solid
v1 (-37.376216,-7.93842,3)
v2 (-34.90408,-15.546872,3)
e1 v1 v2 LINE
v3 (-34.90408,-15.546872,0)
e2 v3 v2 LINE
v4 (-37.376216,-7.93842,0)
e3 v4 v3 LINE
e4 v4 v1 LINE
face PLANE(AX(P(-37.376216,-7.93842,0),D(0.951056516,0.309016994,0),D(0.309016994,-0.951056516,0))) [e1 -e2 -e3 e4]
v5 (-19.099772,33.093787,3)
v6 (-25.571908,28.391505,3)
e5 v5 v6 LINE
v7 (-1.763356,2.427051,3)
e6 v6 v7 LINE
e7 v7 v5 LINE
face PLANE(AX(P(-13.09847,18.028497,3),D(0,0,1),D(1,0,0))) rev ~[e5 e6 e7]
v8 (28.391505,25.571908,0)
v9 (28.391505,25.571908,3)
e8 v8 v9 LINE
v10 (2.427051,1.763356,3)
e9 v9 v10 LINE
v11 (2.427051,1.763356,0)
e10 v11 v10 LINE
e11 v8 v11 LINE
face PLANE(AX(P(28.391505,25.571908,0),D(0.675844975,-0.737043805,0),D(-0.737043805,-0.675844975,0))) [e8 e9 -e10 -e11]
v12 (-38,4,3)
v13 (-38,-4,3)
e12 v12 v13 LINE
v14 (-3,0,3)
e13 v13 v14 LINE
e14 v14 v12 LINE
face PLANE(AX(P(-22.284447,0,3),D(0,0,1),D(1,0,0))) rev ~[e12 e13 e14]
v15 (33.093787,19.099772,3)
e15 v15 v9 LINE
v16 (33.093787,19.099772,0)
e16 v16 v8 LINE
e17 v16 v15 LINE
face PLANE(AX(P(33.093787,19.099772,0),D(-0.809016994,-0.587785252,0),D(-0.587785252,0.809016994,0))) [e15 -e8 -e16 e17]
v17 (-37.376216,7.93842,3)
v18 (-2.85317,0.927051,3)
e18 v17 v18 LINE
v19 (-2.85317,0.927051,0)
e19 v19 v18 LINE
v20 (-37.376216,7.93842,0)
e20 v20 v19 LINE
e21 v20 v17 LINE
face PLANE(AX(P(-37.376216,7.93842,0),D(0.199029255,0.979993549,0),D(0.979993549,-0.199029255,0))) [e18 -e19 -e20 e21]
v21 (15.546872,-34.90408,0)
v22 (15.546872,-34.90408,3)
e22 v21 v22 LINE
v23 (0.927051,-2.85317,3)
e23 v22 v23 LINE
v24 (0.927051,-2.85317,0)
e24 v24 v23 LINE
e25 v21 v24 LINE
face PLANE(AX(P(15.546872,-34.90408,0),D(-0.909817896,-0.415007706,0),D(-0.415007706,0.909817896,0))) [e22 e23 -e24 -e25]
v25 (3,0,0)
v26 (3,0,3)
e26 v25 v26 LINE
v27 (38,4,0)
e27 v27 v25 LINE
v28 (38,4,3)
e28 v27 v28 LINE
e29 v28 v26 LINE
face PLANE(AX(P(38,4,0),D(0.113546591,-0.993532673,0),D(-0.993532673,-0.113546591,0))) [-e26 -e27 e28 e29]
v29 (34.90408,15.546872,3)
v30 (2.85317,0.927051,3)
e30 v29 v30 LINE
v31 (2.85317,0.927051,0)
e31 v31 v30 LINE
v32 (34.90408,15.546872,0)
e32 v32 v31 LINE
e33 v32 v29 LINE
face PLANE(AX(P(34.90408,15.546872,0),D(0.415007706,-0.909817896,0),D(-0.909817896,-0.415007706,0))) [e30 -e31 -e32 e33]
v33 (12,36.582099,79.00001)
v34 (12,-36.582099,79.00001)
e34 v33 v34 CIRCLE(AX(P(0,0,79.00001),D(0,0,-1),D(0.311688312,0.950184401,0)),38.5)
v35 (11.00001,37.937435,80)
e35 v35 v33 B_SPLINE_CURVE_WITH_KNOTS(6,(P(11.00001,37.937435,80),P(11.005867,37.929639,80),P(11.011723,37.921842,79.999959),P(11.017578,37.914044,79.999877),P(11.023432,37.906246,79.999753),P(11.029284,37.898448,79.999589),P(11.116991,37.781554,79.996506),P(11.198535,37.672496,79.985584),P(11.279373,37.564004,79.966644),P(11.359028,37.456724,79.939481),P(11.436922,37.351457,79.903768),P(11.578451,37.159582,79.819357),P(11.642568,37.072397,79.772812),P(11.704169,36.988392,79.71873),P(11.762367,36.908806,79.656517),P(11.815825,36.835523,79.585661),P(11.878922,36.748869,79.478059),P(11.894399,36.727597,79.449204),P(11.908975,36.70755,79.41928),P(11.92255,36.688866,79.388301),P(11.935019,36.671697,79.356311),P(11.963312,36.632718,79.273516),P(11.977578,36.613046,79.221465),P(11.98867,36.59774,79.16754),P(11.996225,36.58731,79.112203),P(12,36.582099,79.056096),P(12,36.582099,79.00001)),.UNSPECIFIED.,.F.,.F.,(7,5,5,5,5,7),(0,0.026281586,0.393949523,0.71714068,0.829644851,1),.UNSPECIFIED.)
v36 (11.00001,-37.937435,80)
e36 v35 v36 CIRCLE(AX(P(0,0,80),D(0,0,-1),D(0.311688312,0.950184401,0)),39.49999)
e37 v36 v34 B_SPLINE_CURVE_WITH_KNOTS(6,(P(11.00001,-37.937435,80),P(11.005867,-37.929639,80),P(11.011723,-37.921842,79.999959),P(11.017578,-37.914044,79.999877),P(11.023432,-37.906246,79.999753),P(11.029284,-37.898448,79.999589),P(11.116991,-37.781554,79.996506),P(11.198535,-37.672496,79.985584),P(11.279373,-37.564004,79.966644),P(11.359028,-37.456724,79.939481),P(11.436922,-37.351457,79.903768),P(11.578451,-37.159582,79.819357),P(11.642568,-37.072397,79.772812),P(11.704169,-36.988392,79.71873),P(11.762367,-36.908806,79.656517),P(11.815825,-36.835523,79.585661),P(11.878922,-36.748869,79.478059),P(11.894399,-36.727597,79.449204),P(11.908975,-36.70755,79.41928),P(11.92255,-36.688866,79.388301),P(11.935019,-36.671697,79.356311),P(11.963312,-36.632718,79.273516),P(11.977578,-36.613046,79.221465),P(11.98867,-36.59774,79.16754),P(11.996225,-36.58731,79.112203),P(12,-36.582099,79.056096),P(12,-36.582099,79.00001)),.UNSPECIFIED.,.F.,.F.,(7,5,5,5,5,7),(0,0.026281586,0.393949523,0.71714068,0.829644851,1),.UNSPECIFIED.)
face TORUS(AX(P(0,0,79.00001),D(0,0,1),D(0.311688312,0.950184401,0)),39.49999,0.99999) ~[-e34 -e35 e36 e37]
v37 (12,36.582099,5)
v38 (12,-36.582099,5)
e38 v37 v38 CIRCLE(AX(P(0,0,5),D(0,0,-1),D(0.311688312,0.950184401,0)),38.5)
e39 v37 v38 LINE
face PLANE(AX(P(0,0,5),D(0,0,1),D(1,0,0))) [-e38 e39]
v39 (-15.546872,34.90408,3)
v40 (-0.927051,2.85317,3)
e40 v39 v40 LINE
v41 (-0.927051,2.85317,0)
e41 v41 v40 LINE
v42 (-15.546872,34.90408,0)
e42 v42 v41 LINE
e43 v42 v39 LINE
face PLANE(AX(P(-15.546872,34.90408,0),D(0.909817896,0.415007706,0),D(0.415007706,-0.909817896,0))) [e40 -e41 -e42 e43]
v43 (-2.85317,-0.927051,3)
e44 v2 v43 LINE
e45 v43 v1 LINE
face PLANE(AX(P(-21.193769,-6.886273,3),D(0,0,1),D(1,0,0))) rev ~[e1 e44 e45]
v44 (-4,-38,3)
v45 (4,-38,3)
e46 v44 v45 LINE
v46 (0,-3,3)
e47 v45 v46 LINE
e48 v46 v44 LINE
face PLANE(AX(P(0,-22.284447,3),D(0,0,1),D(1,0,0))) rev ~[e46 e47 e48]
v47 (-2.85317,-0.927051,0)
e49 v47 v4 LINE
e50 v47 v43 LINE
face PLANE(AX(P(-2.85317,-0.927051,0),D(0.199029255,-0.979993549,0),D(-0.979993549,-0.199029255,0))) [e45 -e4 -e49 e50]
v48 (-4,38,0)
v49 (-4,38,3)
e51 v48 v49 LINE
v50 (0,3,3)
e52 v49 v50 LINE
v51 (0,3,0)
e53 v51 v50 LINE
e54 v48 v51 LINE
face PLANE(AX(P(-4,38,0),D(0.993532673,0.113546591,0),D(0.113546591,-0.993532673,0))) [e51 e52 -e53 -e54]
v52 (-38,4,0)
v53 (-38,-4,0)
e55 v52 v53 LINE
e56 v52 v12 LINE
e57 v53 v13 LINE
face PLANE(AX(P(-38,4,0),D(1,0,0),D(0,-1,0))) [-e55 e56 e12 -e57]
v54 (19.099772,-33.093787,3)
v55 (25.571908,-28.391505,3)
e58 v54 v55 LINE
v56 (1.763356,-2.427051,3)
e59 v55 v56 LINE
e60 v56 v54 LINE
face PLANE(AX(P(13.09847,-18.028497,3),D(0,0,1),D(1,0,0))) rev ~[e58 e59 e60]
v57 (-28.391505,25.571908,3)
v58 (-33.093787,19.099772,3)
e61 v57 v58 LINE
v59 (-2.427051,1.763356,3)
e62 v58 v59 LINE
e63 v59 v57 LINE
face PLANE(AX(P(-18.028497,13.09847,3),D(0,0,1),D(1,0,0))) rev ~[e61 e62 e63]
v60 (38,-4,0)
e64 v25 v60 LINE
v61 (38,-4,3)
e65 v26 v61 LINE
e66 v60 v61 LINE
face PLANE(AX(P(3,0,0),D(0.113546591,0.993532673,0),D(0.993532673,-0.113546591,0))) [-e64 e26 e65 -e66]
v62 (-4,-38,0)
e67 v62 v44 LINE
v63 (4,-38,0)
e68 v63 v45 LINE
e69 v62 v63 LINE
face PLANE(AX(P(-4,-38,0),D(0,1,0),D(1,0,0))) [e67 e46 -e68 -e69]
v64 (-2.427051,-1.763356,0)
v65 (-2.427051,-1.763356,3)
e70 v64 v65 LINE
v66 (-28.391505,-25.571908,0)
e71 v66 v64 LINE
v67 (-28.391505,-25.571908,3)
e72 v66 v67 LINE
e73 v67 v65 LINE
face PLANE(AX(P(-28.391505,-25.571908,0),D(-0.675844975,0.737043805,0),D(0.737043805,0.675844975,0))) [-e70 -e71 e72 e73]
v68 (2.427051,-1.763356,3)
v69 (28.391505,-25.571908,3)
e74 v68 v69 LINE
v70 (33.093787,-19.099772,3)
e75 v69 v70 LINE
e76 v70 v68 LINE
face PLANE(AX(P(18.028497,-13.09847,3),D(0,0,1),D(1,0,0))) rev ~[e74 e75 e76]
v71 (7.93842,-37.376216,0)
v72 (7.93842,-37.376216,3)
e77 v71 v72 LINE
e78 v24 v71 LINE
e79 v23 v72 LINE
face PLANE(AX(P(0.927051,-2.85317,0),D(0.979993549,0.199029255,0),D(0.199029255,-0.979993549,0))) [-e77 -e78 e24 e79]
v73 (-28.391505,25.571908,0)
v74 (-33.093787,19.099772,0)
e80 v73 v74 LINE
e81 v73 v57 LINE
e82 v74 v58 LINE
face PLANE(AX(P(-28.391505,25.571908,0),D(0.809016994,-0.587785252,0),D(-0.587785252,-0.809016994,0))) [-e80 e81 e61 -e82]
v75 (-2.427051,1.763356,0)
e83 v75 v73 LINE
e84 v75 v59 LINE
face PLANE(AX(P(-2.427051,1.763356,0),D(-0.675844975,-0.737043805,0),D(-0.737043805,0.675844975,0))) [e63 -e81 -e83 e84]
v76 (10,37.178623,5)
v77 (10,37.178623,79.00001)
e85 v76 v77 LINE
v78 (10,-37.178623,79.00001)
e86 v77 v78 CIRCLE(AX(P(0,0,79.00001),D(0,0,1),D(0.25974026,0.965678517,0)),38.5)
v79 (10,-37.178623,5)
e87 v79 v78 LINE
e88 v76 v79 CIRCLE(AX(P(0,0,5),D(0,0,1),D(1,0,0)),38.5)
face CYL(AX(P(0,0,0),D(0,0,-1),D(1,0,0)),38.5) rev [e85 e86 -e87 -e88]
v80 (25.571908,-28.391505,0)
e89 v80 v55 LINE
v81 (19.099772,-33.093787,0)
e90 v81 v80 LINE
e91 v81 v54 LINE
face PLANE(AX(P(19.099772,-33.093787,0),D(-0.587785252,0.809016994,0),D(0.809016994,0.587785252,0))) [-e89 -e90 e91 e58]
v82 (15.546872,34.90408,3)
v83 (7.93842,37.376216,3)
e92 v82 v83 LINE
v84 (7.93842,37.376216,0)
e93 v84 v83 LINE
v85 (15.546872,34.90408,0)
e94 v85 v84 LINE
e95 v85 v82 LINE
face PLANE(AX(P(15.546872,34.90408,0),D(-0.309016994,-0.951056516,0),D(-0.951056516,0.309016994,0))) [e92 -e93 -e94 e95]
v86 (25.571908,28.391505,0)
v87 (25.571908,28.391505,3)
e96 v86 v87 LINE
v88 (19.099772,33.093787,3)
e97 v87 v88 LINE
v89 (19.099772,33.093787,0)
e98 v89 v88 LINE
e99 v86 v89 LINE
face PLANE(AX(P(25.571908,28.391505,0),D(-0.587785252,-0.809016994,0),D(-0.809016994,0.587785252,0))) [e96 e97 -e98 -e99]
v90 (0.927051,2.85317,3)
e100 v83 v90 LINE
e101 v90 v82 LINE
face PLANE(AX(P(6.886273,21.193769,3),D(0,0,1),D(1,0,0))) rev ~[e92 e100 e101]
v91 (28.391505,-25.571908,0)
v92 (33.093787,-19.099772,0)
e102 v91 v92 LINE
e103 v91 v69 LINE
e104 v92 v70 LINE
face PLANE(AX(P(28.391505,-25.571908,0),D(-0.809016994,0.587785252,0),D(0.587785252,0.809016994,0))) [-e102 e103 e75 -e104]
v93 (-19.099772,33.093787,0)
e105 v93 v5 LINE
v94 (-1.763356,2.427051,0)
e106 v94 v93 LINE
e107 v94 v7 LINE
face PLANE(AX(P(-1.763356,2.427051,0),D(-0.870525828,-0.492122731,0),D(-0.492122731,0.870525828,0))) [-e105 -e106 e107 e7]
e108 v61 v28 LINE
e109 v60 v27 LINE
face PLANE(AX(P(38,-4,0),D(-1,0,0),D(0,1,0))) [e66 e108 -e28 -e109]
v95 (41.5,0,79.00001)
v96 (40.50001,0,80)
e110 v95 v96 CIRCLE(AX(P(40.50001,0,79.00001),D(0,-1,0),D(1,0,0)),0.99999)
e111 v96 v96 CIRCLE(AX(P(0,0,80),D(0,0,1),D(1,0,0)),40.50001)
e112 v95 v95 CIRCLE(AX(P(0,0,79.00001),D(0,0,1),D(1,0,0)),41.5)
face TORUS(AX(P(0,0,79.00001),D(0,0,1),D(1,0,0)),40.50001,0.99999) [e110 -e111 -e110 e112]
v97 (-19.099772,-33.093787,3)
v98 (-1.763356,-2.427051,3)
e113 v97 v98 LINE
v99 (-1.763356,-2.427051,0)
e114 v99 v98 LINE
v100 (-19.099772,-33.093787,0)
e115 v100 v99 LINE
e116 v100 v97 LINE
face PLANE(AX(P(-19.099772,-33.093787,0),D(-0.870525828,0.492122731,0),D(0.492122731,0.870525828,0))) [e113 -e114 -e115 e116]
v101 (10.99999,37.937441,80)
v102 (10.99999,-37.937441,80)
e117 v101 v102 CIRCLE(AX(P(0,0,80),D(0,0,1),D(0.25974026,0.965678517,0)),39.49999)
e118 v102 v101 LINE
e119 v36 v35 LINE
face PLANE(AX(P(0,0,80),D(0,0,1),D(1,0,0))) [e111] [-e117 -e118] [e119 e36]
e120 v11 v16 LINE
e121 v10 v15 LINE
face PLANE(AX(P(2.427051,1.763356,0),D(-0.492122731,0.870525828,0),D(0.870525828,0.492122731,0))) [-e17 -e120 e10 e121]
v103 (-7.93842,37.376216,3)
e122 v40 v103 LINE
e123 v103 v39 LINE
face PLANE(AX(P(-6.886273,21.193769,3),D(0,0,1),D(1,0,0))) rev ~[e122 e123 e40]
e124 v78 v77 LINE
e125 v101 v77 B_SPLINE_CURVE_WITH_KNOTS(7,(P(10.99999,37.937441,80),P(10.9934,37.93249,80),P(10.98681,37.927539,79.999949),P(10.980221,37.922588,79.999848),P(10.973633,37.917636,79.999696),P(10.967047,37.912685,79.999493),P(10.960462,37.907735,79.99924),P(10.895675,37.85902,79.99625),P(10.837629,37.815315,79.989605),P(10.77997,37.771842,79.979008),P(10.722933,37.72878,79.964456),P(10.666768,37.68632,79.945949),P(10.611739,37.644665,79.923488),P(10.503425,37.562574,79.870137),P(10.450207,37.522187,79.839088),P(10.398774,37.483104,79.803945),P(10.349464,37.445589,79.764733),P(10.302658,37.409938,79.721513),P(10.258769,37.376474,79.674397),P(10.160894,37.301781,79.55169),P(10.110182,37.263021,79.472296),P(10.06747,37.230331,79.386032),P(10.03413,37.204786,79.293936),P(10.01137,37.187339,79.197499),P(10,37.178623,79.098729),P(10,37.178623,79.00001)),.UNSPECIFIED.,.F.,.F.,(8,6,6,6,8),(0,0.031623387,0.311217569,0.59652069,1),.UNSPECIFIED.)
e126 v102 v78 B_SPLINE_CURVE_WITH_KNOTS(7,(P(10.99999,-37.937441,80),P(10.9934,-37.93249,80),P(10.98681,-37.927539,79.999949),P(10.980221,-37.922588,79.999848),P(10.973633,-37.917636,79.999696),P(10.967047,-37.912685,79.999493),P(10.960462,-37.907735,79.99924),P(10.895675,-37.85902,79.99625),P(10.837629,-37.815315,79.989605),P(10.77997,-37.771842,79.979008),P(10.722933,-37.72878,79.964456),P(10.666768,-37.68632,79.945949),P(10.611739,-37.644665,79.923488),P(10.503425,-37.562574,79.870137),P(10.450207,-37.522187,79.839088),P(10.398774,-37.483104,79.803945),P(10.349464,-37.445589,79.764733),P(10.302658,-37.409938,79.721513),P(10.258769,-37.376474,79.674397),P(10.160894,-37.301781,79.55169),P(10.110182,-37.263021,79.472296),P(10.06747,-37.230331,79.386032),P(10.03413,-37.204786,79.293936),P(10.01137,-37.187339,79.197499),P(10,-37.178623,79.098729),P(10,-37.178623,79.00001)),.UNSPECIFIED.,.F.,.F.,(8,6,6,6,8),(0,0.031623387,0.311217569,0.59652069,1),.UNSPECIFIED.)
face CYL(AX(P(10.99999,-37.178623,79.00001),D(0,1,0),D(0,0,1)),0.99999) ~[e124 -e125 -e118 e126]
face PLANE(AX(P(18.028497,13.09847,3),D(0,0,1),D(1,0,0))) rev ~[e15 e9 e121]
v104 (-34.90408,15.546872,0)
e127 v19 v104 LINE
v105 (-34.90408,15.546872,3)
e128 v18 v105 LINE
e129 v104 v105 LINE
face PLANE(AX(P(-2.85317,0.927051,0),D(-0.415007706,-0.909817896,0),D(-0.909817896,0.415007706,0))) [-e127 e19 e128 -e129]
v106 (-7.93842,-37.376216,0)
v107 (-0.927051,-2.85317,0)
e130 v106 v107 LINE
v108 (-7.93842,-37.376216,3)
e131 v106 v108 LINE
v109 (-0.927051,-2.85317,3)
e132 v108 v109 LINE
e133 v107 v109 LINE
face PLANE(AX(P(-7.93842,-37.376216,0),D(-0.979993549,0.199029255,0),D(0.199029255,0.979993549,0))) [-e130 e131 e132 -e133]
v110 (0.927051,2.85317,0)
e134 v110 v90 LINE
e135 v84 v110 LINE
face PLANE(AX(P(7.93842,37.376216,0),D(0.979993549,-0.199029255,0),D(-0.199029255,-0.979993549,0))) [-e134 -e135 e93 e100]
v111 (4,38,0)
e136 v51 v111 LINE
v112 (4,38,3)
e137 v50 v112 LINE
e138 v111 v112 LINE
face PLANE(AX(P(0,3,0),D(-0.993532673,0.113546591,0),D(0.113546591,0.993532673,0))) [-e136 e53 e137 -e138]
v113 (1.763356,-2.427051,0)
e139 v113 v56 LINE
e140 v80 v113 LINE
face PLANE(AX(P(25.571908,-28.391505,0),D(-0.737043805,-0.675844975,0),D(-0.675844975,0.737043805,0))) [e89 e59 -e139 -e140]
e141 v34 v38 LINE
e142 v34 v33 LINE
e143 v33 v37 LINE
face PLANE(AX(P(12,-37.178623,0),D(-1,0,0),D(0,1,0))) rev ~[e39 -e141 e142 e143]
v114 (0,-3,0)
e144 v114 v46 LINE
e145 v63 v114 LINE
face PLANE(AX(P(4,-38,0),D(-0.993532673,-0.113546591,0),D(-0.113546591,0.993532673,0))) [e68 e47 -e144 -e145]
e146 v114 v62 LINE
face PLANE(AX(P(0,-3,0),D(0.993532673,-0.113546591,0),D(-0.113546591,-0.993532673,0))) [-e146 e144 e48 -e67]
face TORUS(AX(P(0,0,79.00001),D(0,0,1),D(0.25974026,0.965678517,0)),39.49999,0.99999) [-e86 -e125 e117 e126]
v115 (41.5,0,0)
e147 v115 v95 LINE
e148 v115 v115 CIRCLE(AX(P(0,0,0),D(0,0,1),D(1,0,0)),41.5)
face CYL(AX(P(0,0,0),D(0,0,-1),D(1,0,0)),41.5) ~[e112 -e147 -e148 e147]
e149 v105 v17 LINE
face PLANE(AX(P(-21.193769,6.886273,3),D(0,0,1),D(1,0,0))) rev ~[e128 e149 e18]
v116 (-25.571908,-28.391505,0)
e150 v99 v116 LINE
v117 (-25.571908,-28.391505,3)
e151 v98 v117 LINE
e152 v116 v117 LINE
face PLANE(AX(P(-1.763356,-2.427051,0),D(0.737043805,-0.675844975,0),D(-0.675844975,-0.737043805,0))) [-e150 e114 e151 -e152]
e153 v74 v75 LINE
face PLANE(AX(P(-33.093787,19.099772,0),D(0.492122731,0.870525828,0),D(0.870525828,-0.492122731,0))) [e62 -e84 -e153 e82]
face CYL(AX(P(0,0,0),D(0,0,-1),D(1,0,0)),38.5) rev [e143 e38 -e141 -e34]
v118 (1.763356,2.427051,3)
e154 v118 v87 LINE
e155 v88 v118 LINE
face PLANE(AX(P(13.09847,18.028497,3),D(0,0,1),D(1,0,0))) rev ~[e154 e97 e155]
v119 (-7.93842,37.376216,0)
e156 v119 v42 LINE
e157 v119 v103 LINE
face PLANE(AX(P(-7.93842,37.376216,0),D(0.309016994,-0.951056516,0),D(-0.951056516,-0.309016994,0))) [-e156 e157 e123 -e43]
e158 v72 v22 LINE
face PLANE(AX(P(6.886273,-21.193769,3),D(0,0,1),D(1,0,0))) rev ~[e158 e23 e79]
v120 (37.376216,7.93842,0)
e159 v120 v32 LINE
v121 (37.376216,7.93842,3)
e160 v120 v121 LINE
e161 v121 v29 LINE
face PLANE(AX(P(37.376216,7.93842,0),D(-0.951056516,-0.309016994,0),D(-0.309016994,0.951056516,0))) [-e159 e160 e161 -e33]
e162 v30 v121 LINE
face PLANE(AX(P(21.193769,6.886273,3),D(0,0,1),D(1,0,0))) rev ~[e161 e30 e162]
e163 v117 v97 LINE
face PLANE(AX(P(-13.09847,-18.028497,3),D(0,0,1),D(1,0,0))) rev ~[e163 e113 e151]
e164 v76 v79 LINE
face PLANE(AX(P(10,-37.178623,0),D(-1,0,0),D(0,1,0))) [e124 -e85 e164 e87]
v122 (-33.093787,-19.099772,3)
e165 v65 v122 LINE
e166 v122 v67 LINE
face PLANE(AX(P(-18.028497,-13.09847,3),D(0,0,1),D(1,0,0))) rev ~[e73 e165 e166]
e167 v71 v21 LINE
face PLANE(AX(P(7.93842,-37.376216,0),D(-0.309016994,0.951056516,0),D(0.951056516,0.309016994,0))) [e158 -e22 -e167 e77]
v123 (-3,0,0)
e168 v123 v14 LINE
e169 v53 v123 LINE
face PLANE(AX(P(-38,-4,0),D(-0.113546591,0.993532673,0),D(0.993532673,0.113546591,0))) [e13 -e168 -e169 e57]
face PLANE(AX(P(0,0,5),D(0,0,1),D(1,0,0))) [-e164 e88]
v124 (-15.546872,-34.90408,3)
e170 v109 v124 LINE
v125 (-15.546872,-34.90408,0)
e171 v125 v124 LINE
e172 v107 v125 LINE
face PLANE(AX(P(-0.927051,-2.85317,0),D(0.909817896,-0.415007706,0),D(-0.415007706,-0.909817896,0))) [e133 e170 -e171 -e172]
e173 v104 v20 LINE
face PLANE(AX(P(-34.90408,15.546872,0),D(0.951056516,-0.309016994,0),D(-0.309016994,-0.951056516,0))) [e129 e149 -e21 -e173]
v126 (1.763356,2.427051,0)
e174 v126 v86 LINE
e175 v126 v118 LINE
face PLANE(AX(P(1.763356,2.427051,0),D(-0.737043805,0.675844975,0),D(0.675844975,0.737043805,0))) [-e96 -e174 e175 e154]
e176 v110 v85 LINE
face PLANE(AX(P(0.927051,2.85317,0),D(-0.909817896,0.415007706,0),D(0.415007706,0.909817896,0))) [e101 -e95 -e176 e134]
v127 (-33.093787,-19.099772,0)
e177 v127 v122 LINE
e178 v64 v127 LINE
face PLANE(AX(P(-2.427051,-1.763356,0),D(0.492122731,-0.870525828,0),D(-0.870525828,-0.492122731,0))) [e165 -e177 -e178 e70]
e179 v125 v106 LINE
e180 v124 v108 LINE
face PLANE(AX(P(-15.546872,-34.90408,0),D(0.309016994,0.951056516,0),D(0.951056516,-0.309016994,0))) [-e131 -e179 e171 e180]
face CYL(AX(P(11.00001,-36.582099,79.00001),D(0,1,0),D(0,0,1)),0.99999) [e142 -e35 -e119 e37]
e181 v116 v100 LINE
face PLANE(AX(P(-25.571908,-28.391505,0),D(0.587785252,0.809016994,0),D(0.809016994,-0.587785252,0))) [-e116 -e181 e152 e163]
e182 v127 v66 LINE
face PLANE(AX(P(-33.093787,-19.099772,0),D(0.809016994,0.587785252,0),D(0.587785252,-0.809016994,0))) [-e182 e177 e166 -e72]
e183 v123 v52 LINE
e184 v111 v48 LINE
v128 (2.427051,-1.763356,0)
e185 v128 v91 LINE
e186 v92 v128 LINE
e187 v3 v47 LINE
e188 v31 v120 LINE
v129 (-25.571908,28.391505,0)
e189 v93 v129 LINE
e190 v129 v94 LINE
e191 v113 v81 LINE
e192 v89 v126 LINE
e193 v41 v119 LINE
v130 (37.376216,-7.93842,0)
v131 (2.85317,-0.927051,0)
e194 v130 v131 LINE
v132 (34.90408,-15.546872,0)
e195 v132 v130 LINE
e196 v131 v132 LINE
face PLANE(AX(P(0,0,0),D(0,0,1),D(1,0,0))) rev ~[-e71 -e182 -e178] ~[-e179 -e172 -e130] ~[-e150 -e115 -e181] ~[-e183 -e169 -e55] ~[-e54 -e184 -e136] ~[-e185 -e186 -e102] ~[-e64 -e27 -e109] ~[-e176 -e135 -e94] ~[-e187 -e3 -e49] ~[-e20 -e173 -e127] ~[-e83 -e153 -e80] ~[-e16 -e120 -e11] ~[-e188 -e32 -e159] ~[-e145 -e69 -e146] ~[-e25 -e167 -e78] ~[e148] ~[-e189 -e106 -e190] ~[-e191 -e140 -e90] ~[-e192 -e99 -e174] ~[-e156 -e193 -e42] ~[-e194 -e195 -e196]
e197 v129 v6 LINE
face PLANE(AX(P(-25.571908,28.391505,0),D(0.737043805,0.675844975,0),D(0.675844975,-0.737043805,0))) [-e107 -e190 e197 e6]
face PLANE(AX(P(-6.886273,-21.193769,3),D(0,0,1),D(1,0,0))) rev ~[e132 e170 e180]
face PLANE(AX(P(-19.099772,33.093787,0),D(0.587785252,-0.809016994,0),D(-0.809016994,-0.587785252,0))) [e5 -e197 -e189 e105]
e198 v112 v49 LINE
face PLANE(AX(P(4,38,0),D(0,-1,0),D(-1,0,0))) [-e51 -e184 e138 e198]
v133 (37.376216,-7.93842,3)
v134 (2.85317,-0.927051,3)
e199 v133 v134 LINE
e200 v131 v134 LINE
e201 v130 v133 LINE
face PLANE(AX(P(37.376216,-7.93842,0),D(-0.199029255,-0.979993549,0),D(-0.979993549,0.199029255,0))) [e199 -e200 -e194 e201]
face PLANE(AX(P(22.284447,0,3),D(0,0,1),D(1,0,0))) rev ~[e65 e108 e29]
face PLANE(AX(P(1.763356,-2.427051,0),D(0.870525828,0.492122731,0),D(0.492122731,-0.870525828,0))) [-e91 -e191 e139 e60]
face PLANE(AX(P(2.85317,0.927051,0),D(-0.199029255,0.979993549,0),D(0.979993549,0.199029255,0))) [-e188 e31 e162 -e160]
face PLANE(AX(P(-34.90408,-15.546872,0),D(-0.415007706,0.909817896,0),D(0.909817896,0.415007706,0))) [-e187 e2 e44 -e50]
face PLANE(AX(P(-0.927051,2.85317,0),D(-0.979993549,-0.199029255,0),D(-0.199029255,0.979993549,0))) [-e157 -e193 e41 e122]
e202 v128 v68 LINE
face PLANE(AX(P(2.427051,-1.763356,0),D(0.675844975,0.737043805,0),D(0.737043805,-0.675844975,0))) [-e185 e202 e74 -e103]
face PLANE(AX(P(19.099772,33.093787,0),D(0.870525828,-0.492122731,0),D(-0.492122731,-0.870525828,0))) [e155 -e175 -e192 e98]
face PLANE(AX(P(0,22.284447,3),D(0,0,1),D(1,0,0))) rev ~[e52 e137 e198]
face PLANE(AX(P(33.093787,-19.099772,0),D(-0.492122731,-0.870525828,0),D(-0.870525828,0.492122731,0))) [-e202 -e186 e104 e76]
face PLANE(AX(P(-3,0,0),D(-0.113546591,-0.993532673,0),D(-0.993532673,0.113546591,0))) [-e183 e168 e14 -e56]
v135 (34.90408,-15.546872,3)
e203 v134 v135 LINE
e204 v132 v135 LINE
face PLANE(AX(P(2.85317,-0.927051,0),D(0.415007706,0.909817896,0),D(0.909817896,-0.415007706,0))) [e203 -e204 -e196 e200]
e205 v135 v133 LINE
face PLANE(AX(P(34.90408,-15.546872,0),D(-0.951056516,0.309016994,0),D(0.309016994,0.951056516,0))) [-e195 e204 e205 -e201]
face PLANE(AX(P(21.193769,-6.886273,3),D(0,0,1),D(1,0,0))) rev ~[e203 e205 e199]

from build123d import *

# Parameters (mm, degrees)
F0_R     = 38.5
F2_DEPTH = 5
F0_R_2   = 41.5
F1_W     = 2
F1_H     = 74.3572457801
F3_DEPTH = 80
F5_DEPTH = 3
F6_R     = 0.99999


# Not quite as in the source:
# - a fillet or chamfer is up to 0.001 mm smaller than in the source, because OpenCascade refuses the exact size


with BuildPart() as f2:
    # F0 (on Top) → F2 (new body)
    with BuildSketch(Plane.XY):
        Circle(F0_R)
    extrude(amount=F2_DEPTH)

    # F0 (on Top) + F1 (on Top) → F3 (join)
    with BuildSketch(Plane.XY):
        Circle(F0_R_2)
        Circle(F0_R, mode=Mode.SUBTRACT)
    with BuildSketch(Plane.XY):
        with Locations((11, 0)):
            Rectangle(F1_W, F1_H)
    extrude(amount=F3_DEPTH)

    # F4 (on Top) → F5 (cut)
    with BuildSketch(Plane.XY):
        Polygon((0, -3), (-4, -38), (4, -38), align=None)
        Polygon((15.5468718514, -34.9040796417), (0.9270509831, -2.8531695489), (7.9384197211, -37.3762155967), align=None)
        Polygon((25.5719075646, -28.3915047771), (1.7633557569, -2.4270509831), (19.0997716096, -33.0937867954), align=None)
        Polygon((33.0937867954, -19.0997716096), (2.4270509831, -1.7633557569), (28.3915047771, -25.5719075646), align=None)
        Polygon((37.3762155967, -7.9384197211), (2.8531695489, -0.9270509831), (34.9040796417, -15.5468718514), align=None)
        Polygon((38, 4), (3, 0), (38, -4), align=None)
        Polygon((34.9040796417, 15.5468718514), (2.8531695489, 0.9270509831), (37.3762155967, 7.9384197211), align=None)
        Polygon((28.3915047771, 25.5719075646), (2.4270509831, 1.7633557569), (33.0937867954, 19.0997716096), align=None)
        Polygon((19.0997716096, 33.0937867954), (1.7633557569, 2.4270509831), (25.5719075646, 28.3915047771), align=None)
        Polygon((7.9384197211, 37.3762155967), (0.9270509831, 2.8531695489), (15.5468718514, 34.9040796417), align=None)
        Polygon((-4, 38), (0, 3), (4, 38), align=None)
        Polygon((-15.5468718514, 34.9040796417), (-0.9270509831, 2.8531695489), (-7.9384197211, 37.3762155967), align=None)
        Polygon((-25.5719075646, 28.3915047771), (-1.7633557569, 2.4270509831), (-19.0997716096, 33.0937867954), align=None)
        Polygon((-33.0937867954, 19.0997716096), (-2.4270509831, 1.7633557569), (-28.3915047771, 25.5719075646), align=None)
        Polygon((-37.3762155967, 7.9384197211), (-2.8531695489, 0.9270509831), (-34.9040796417, 15.5468718514), align=None)
        Polygon((-38, -4), (-3, 0), (-38, 4), align=None)
        Polygon((-34.9040796417, -15.5468718514), (-2.8531695489, -0.9270509831), (-37.3762155967, -7.9384197211), align=None)
        Polygon((-28.3915047771, -25.5719075646), (-2.4270509831, -1.7633557569), (-33.0937867954, -19.0997716096), align=None)
        Polygon((-19.0997716096, -33.0937867954), (-1.7633557569, -2.4270509831), (-25.5719075646, -28.3915047771), align=None)
        Polygon((-7.9384197211, -37.3762155967), (-0.9270509831, -2.8531695489), (-15.5468718514, -34.9040796417), align=None)
    extrude(amount=F5_DEPTH, mode=Mode.SUBTRACT)

    # F6 (radius 1 in the source; OpenCascade refuses exactly that, so slightly less here)
    f6_edges = [f2.edges().sort_by_distance(p)[0] for p in [
        (-38.5, 0, 80),
        (-41.5, 0, 80),
        (12, 0, 80),
        (10, 0, 80),
        (38.5, 0, 80),
    ]]
    fillet(f6_edges, radius=F6_R)


solid = f2.part
